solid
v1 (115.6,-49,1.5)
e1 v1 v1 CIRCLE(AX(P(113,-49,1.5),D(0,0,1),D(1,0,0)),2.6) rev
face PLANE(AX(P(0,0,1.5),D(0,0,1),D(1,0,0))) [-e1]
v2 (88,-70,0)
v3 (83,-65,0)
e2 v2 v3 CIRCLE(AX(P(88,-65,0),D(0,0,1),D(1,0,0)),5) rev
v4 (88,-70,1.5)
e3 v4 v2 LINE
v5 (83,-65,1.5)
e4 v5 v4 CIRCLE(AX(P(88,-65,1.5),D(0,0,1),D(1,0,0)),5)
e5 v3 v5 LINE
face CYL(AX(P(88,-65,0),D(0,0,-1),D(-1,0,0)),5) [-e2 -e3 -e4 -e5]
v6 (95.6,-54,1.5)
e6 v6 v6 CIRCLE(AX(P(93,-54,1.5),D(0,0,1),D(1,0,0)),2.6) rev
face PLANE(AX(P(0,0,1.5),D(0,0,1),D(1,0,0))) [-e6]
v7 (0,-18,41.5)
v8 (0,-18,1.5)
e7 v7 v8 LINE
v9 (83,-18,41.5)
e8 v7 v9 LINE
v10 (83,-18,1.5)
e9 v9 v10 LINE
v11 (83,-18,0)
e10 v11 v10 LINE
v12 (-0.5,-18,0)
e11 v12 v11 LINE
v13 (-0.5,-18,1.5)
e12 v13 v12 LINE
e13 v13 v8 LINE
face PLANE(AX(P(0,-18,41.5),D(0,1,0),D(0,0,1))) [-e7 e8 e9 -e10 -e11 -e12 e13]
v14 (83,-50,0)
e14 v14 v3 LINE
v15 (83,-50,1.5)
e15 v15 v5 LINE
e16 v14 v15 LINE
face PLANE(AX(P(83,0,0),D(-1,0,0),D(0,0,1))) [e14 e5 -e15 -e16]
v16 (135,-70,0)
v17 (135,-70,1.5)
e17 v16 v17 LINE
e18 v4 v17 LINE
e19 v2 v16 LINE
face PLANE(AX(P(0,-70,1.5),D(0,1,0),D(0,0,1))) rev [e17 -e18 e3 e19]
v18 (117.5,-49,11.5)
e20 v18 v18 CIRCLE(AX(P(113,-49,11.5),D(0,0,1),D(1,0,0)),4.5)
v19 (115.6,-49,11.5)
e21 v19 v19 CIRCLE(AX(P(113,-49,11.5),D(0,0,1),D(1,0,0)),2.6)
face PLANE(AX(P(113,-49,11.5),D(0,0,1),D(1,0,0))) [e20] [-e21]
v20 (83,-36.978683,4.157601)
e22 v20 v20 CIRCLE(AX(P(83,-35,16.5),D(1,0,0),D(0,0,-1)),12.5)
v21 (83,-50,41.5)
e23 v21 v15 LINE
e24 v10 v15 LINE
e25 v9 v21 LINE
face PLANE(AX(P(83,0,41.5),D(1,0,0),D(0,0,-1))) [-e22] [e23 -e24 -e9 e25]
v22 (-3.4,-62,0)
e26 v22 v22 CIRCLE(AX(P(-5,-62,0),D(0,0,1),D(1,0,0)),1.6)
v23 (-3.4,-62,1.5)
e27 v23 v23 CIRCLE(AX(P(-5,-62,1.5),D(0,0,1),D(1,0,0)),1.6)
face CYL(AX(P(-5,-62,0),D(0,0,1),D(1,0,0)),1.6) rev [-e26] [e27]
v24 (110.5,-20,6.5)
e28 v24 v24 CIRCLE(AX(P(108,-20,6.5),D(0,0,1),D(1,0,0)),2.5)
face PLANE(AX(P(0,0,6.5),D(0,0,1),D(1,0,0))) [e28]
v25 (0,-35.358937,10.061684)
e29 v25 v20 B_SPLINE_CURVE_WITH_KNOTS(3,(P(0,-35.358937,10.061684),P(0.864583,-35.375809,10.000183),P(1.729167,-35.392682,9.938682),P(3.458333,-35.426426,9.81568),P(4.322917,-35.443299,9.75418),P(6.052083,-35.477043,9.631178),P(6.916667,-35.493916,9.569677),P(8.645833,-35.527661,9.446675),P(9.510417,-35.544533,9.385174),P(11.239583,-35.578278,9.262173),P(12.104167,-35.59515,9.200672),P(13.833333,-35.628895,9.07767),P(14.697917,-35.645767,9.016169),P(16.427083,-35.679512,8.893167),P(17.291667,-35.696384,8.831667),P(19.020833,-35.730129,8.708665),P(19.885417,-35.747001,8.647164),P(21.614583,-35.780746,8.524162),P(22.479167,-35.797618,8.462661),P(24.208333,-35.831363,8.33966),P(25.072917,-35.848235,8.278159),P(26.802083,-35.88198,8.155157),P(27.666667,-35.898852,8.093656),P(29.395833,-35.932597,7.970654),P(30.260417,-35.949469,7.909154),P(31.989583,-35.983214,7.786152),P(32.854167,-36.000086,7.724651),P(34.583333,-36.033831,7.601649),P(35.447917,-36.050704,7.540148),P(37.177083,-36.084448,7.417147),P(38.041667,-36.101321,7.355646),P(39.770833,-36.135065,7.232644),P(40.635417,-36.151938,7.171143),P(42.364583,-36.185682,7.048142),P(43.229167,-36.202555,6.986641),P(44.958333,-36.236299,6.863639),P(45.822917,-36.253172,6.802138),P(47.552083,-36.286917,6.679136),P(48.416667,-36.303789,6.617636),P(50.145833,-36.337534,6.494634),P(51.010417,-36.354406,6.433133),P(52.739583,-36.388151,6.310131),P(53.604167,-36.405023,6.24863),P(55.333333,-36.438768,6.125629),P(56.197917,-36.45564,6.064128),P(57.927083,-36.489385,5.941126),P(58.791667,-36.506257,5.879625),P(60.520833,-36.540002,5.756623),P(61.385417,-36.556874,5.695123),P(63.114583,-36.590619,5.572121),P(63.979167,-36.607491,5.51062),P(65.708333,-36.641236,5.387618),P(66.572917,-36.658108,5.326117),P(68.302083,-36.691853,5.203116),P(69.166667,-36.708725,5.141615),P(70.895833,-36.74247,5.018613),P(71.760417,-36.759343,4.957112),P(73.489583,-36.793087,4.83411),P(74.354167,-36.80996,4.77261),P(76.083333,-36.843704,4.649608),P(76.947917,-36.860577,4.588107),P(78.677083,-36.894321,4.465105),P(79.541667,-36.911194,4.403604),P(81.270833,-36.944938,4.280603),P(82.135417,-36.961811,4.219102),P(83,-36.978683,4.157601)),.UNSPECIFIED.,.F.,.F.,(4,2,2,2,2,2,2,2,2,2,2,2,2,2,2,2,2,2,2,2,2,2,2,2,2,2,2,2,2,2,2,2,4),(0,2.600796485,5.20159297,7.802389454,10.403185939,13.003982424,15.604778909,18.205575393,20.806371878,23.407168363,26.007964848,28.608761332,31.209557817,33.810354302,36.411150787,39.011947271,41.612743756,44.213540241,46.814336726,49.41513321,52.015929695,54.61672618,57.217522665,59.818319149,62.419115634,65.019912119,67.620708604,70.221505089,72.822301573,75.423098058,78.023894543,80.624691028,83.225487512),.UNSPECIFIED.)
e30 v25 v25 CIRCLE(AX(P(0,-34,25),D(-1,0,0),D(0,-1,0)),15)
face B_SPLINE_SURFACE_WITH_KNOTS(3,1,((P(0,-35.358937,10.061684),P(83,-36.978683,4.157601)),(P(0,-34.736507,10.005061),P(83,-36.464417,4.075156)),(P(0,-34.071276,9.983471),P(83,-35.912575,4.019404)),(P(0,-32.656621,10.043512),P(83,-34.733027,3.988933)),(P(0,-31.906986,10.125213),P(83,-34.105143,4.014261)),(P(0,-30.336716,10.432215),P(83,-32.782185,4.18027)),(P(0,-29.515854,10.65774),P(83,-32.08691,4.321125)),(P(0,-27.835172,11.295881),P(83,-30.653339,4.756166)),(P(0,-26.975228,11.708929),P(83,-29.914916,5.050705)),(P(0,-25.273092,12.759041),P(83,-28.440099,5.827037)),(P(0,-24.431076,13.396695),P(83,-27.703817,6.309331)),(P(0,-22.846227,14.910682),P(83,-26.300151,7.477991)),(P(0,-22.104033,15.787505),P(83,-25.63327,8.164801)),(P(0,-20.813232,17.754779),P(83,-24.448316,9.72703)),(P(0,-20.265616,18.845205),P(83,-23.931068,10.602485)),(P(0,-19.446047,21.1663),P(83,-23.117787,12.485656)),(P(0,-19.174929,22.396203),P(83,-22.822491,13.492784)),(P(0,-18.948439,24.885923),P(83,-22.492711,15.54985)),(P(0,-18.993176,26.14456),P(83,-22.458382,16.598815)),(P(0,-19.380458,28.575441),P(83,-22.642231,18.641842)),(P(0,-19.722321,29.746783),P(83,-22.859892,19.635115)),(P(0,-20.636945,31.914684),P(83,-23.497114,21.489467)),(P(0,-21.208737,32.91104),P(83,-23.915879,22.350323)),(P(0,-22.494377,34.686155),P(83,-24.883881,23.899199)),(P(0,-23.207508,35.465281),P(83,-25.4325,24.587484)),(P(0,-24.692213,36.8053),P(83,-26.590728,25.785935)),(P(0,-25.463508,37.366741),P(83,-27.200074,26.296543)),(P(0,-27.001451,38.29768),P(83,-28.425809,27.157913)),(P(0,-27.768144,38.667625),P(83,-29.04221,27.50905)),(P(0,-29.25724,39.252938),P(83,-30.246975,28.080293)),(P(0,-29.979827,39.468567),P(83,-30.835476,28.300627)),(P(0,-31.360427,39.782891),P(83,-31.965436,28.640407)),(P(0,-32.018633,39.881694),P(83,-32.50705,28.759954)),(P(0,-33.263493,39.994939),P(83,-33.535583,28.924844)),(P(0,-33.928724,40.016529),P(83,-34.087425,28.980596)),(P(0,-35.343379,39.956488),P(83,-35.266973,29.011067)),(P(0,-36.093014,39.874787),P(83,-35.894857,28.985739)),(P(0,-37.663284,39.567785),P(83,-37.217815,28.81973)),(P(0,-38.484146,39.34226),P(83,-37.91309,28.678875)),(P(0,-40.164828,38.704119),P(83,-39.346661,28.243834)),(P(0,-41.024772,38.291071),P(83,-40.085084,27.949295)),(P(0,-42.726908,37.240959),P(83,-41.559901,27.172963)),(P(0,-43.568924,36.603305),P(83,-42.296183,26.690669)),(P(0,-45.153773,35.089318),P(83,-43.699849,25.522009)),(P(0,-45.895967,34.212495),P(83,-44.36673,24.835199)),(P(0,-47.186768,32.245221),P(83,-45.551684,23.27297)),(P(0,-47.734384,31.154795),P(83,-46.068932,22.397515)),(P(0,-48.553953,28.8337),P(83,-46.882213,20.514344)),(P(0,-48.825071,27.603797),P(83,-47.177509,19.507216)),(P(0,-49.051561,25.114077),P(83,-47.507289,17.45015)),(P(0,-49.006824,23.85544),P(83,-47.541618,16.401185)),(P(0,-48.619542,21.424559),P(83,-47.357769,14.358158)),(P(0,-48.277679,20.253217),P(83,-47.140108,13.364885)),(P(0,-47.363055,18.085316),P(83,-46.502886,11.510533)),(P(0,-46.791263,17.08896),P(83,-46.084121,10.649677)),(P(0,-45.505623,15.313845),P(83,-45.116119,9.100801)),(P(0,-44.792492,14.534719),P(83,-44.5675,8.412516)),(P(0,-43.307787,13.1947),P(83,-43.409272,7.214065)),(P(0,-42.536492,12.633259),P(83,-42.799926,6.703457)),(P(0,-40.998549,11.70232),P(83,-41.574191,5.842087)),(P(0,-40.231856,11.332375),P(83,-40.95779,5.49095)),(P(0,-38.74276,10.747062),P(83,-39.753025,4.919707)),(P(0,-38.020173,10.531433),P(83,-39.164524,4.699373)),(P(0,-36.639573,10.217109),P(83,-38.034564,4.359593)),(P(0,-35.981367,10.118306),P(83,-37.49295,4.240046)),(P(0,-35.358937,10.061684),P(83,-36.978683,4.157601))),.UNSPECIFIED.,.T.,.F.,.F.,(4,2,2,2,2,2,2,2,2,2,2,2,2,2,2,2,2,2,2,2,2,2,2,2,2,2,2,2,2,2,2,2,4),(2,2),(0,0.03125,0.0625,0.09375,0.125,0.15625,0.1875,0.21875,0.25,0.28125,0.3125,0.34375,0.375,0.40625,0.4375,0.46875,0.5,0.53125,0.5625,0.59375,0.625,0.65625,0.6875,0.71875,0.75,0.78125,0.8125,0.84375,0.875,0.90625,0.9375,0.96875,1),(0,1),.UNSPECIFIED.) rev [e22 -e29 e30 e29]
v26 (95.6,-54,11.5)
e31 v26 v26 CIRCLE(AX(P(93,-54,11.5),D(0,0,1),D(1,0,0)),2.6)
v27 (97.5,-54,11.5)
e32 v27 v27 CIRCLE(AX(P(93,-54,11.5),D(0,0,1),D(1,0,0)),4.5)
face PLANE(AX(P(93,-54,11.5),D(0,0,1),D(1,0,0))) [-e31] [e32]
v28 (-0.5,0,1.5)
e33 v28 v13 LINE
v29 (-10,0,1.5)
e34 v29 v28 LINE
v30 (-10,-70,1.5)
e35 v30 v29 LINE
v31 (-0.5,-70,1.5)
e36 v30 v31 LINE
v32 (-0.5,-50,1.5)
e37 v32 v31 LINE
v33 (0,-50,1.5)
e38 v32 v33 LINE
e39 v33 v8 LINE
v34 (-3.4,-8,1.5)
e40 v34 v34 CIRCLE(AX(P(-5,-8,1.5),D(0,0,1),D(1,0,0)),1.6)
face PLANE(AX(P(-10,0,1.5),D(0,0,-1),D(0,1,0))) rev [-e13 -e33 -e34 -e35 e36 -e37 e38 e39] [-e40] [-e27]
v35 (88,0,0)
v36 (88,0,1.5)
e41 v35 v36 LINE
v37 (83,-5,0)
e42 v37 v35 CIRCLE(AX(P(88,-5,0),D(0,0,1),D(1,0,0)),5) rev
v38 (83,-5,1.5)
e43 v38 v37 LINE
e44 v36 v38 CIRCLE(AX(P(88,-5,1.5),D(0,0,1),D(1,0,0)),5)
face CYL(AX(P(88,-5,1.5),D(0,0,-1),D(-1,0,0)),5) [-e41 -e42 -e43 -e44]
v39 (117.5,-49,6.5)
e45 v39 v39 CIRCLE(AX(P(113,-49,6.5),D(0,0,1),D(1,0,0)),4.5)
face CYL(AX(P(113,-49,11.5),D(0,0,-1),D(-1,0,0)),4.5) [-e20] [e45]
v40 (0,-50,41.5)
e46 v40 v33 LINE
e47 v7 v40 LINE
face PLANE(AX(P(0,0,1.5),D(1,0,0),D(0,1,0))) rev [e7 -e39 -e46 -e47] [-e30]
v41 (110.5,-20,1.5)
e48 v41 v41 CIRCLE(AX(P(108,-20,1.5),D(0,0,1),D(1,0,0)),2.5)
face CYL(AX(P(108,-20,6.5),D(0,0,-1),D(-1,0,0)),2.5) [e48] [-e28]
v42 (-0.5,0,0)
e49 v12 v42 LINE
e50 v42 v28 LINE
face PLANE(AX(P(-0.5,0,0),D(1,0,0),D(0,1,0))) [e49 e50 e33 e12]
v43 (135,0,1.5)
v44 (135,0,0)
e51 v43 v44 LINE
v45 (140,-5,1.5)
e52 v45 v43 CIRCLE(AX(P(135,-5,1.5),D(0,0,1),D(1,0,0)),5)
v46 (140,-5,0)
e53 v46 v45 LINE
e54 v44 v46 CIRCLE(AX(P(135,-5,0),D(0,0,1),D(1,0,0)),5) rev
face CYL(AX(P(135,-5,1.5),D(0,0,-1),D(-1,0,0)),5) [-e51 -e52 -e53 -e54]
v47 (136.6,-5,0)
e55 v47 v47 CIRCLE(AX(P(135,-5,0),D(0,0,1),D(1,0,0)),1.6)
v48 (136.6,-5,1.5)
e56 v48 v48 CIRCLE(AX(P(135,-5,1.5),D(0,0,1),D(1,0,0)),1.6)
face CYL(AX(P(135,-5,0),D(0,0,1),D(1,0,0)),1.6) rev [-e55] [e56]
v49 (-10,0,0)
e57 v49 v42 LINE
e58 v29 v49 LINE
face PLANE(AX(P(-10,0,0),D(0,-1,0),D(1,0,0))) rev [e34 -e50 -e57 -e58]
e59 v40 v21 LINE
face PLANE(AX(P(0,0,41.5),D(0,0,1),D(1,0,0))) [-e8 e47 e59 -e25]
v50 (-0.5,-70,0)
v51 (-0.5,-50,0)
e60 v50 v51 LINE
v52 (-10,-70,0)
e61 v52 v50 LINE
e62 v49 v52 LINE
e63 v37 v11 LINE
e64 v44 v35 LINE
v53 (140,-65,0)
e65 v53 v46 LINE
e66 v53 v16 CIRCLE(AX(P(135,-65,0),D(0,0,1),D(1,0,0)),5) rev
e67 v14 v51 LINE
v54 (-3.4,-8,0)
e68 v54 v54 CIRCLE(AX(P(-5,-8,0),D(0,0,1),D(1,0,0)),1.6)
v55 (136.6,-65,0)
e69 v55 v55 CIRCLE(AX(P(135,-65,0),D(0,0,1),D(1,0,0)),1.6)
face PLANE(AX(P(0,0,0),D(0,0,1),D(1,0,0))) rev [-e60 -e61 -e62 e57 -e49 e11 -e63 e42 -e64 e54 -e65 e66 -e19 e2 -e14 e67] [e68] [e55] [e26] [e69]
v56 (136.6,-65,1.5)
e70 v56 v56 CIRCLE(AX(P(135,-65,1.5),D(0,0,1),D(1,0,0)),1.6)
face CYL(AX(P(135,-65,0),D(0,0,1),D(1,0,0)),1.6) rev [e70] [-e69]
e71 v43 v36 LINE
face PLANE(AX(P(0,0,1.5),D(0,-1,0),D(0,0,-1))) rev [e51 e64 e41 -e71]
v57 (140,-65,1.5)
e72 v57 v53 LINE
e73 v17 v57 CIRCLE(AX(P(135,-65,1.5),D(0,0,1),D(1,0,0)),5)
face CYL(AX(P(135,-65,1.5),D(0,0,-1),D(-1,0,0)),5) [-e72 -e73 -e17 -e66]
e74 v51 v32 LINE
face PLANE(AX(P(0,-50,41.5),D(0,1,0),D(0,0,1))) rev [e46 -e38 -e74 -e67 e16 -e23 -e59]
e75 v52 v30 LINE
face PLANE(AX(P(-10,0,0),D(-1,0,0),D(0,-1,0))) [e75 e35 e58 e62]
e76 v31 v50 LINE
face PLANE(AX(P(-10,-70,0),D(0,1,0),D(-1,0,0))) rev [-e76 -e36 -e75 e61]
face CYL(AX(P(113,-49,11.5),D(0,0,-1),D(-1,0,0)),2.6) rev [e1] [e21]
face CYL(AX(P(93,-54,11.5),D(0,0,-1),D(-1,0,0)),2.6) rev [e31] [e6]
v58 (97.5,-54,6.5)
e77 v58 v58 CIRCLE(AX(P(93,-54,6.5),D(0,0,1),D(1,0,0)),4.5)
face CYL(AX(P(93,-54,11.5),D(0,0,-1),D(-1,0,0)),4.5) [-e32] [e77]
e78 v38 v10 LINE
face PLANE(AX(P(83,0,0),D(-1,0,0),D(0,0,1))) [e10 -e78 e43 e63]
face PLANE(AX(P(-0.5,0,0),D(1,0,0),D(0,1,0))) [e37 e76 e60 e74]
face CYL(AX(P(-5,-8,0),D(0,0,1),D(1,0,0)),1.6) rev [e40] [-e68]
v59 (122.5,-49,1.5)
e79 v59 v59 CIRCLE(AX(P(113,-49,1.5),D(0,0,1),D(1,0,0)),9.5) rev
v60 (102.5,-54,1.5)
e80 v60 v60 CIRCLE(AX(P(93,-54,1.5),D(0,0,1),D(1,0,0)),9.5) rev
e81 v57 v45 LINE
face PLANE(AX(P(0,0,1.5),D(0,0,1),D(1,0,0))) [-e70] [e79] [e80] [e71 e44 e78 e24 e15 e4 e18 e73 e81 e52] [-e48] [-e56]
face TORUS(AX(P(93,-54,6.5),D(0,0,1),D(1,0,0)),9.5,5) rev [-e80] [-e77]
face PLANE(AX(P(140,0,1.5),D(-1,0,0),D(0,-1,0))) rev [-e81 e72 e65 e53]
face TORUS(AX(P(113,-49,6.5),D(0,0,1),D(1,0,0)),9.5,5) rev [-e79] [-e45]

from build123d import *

# Parameters (mm, degrees)
ESQUISSE1_W             = 140
ESQUISSE1_H             = 70
BOSS_EXTRU_1_DEPTH      = 1.5
ESQUISSE2_R             = 1.6
ENL_V_MAT_EXTRU_2_DEPTH = 1.5
ESQUISSE2_4_R           = 2.5
BOSS_EXTRU_2_DEPTH      = 5
BOSS_EXTRU_3_DEPTH      = 40
ESQUISSE11_R            = 4.5
ESQUISSE11_R_2          = 2.6
BOSS_EXTRU_4_DEPTH      = 10
CONG_1_R                = 5
ESQUISSE14_W            = 83
ESQUISSE14_H            = 18
ESQUISSE14_H_2          = 20
ENL_V_MAT_EXTRU_3_DEPTH = 162.554944214
CONG_3_R                = 5
ESQUISSE17_W            = 1.5
ESQUISSE17_H            = 70
BOSS_EXTRU_5_DEPTH      = 10
ESQUISSE18_R            = 1.6
ENL_V_MAT_EXTRU_4_DEPTH = 162.554944239
ESQUISSE22_W            = 1.5
ESQUISSE22_H            = 18
ESQUISSE22_H_2          = 20
ENL_V_MAT_EXTRU_5_DEPTH = 0.5


with BuildPart() as part:
    # Esquisse1 → Boss.-Extru.1 (new body)
    with BuildSketch(Plane.XY):
        with Locations((70, -35)):
            Rectangle(ESQUISSE1_W, ESQUISSE1_H)
    extrude(amount=BOSS_EXTRU_1_DEPTH)

    # Esquisse2 → Enlèv. mat.-Extru.2 (cut)
    with BuildSketch(Plane.XY.offset(1.5)):
        with Locations((135, -5)):
            Circle(ESQUISSE2_R)
        with Locations((135, -65)):
            Circle(ESQUISSE2_R)
    extrude(amount=-ENL_V_MAT_EXTRU_2_DEPTH, mode=Mode.SUBTRACT)

    # Esquisse2<4> → Boss.-Extru.2 (add)
    with BuildSketch(Plane.XY.offset(1.5)):
        with Locations((108, -20)):
            Circle(ESQUISSE2_4_R)
    extrude(amount=BOSS_EXTRU_2_DEPTH)

    # Esquisse2<5> → Boss.-Extru.3 (add)
    with BuildSketch(Plane.XY.offset(1.5)):
        Polygon((83, -18), (0, -18), (0, -50), (7.5, -50), (75, -50), (76.464784117, -50), (83, -50), (83, -45), align=None)
    extrude(amount=BOSS_EXTRU_3_DEPTH)

    # Esquisse11 → Boss.-Extru.4 (add)
    # profile 1 of 2: a face of its own
    with BuildSketch(Plane.XY.offset(1.5)):
        with Locations((113, -49)):
            Circle(ESQUISSE11_R)
        with Locations((113, -49)):
            Circle(ESQUISSE11_R_2, mode=Mode.SUBTRACT)
    # profile 2 of 2: a face of its own
    with BuildSketch(Plane.XY.offset(1.5)):
        with Locations((93, -54)):
            Circle(ESQUISSE11_R)
        with Locations((93, -54)):
            Circle(ESQUISSE11_R_2, mode=Mode.SUBTRACT)
    extrude(amount=BOSS_EXTRU_4_DEPTH)

    # Congé1
    cong_1_edges = [part.edges().sort_by_distance(p)[0] for p in [
        (108.5, -49, 1.5),
        (88.5, -54, 1.5),
    ]]
    fillet(cong_1_edges, radius=CONG_1_R)

    # Esquisse14 → Enlèv. mat.-Extru.3 (cut, through all)
    with BuildSketch(Plane.XY.offset(1.5)):
        with Locations((41.5, -9)):
            Rectangle(ESQUISSE14_W, ESQUISSE14_H)
        with Locations((41.5, -60)):
            Rectangle(ESQUISSE14_W, ESQUISSE14_H_2)
    extrude(amount=-ENL_V_MAT_EXTRU_3_DEPTH, mode=Mode.SUBTRACT)

    # Congé3
    cong_3_edges = [part.edges().sort_by_distance(p)[0] for p in [
        (83, 0, 0.75),
        (140, 0, 0.75),
        (140, -70, 0.75),
        (83, -70, 0.75),
    ]]
    fillet(cong_3_edges, radius=CONG_3_R)

    # Enlèvement de matière-Lissage1: read off the stored shape, not the designer's step
    # Enlèvement de matière-Lissage1: loft between two sections, ruled curve by curve
    enl_vement_de_mati_re_lissage1_from = [
        Edge.make_bspline([(0, -35.358936945, 10.061683817), (0, -34.736507104, 10.005061444), (0, -34.071276467, 9.983471322), (0, -32.656620792, 10.043511569), (0, -31.906986183, 10.125212836), (0, -30.336715689, 10.432215403), (0, -29.515853558, 10.657740433), (0, -27.835171711, 11.295881241), (0, -26.97522752, 11.708928876), (0, -25.273092172, 12.759040897), (0, -24.43107638, 13.396695447), (0, -22.846227272, 14.910682395), (0, -22.104033135, 15.787505474), (0, -20.813231902, 17.754778804), (0, -20.26561628, 18.845205387), (0, -19.446047462, 21.166299645), (0, -19.174928563, 22.396203373), (0, -18.948439072, 24.885922737), (0, -18.993175694, 26.144559807), (0, -19.380457825, 28.575441159), (0, -19.722320583, 29.746783491), (0, -20.636945499, 31.91468419), (0, -21.20873673, 32.91104037), (0, -22.494376602, 34.686155378), (0, -23.207508016, 35.465281495), (0, -24.692213453, 36.805300064), (0, -25.463508496, 37.366741349), (0, -27.001451353, 38.297680084), (0, -27.768143671, 38.667624764), (0, -29.257240332, 39.252937618), (0, -29.979826835, 39.468566674), (0, -31.360426607, 39.782890995), (0, -32.018633214, 39.88169381), (0, -33.263492896, 39.994938556), (0, -33.928723533, 40.016528678), (0, -35.343379208, 39.956488431), (0, -36.093013817, 39.874787164), (0, -37.663284311, 39.567784597), (0, -38.484146442, 39.342259567), (0, -40.164828289, 38.704118759), (0, -41.02477248, 38.291071124), (0, -42.726907828, 37.240959103), (0, -43.56892362, 36.603304553), (0, -45.153772728, 35.089317605), (0, -45.895966865, 34.212494526), (0, -47.186768098, 32.245221196), (0, -47.73438372, 31.154794613), (0, -48.553952538, 28.833700355), (0, -48.825071437, 27.603796627), (0, -49.051560928, 25.114077263), (0, -49.006824306, 23.855440193), (0, -48.619542175, 21.424558841), (0, -48.277679417, 20.253216509), (0, -47.363054501, 18.08531581), (0, -46.79126327, 17.08895963), (0, -45.505623398, 15.313844622), (0, -44.792491984, 14.534718505), (0, -43.307786547, 13.194699936), (0, -42.536491504, 12.633258651), (0, -40.998548647, 11.702319916), (0, -40.231856329, 11.332375236), (0, -38.742759668, 10.747062382), (0, -38.020173165, 10.531433326), (0, -36.639573393, 10.217109005), (0, -35.981366786, 10.11830619), (0, -35.358936945, 10.061683817)], [0, 0, 0, 0, 0.03125, 0.03125, 0.0625, 0.0625, 0.09375, 0.09375, 0.125, 0.125, 0.15625, 0.15625, 0.1875, 0.1875, 0.21875, 0.21875, 0.25, 0.25, 0.28125, 0.28125, 0.3125, 0.3125, 0.34375, 0.34375, 0.375, 0.375, 0.40625, 0.40625, 0.4375, 0.4375, 0.46875, 0.46875, 0.5, 0.5, 0.53125, 0.53125, 0.5625, 0.5625, 0.59375, 0.59375, 0.625, 0.625, 0.65625, 0.65625, 0.6875, 0.6875, 0.71875, 0.71875, 0.75, 0.75, 0.78125, 0.78125, 0.8125, 0.8125, 0.84375, 0.84375, 0.875, 0.875, 0.90625, 0.90625, 0.9375, 0.9375, 0.96875, 0.96875, 1, 1, 1, 1], 3),
    ]
    enl_vement_de_mati_re_lissage1_to = [
        Edge.make_bspline([(83, -36.978683165, 4.157601006), (83, -36.46441654, 4.075155874), (83, -35.912574895, 4.019404171), (83, -34.733027399, 3.988933266), (83, -34.105143284, 4.014261099), (83, -32.782184956, 4.18027026), (83, -32.086909931, 4.321124739), (83, -30.653339337, 4.756165981), (83, -29.914915742, 5.050704715), (83, -28.440098529, 5.827037097), (83, -27.703817174, 6.30933137), (83, -26.300151244, 7.477991211), (83, -25.633270194, 8.16480105), (83, -24.448315736, 9.727029605), (83, -23.931067977, 10.602484983), (83, -23.117787224, 12.485655838), (83, -22.82249127, 13.492783585), (83, -22.492710742, 15.549850084), (83, -22.458382278, 16.598815077), (83, -22.642231037, 18.641841677), (83, -22.85989188, 19.635114611), (83, -23.497113975, 21.489467093), (83, -23.915879492, 22.35032337), (83, -24.883881149, 23.899199305), (83, -25.432500118, 24.587483568), (83, -26.590728024, 25.785935025), (83, -27.200073831, 26.296542663), (83, -28.425809001, 27.15791298), (83, -29.04220995, 27.509050012), (83, -30.246974936, 28.080293485), (83, -30.835475596, 28.300627173), (83, -31.965435919, 28.640407161), (83, -32.50705021, 28.759953862), (83, -33.53558346, 28.924844126), (83, -34.087425105, 28.980595829), (83, -35.266972601, 29.011066734), (83, -35.894856716, 28.985738901), (83, -37.217815044, 28.81972974), (83, -37.913090069, 28.678875261), (83, -39.346660663, 28.243834019), (83, -40.085084258, 27.949295285), (83, -41.559901471, 27.172962903), (83, -42.296182826, 26.69066863), (83, -43.699848756, 25.522008789), (83, -44.366729806, 24.83519895), (83, -45.551684264, 23.272970395), (83, -46.068932023, 22.397515017), (83, -46.882212776, 20.514344162), (83, -47.17750873, 19.507216415), (83, -47.507289258, 17.450149916), (83, -47.541617722, 16.401184923), (83, -47.357768963, 14.358158323), (83, -47.14010812, 13.364885389), (83, -46.502886025, 11.510532907), (83, -46.084120508, 10.64967663), (83, -45.116118851, 9.100800695), (83, -44.567499882, 8.412516432), (83, -43.409271976, 7.214064975), (83, -42.799926169, 6.703457337), (83, -41.574190999, 5.84208702), (83, -40.95779005, 5.490949988), (83, -39.753025064, 4.919706515), (83, -39.164524404, 4.699372827), (83, -38.034564081, 4.359592839), (83, -37.49294979, 4.240046138), (83, -36.978683165, 4.157601006)], [0, 0, 0, 0, 0.03125, 0.03125, 0.0625, 0.0625, 0.09375, 0.09375, 0.125, 0.125, 0.15625, 0.15625, 0.1875, 0.1875, 0.21875, 0.21875, 0.25, 0.25, 0.28125, 0.28125, 0.3125, 0.3125, 0.34375, 0.34375, 0.375, 0.375, 0.40625, 0.40625, 0.4375, 0.4375, 0.46875, 0.46875, 0.5, 0.5, 0.53125, 0.53125, 0.5625, 0.5625, 0.59375, 0.59375, 0.625, 0.625, 0.65625, 0.65625, 0.6875, 0.6875, 0.71875, 0.71875, 0.75, 0.75, 0.78125, 0.78125, 0.8125, 0.8125, 0.84375, 0.84375, 0.875, 0.875, 0.90625, 0.90625, 0.9375, 0.9375, 0.96875, 0.96875, 1, 1, 1, 1], 3),
    ]
    enl_vement_de_mati_re_lissage1 = Solid(Shell([*[Face.make_surface_from_curves(enl_vement_de_mati_re_lissage1_from[k], enl_vement_de_mati_re_lissage1_to[k]) for k in range(1)], Face(Wire(enl_vement_de_mati_re_lissage1_from)), Face(Wire(enl_vement_de_mati_re_lissage1_to))]))
    add(enl_vement_de_mati_re_lissage1, mode=Mode.SUBTRACT)

    # Esquisse17 → Boss.-Extru.5 (add)
    with BuildSketch(Plane.ZY):
        with Locations((0.75, -35)):
            Rectangle(ESQUISSE17_W, ESQUISSE17_H)
    extrude(amount=BOSS_EXTRU_5_DEPTH)

    # Esquisse18 → Enlèv. mat.-Extru.4 (cut, through all)
    with BuildSketch(Plane.XY.offset(1.5)):
        with Locations((-5, -8)):
            Circle(ESQUISSE18_R)
        with Locations((-5, -62)):
            Circle(ESQUISSE18_R)
    extrude(amount=-ENL_V_MAT_EXTRU_4_DEPTH, mode=Mode.SUBTRACT)

    # Esquisse22 → Enlèv. mat.-Extru.5 (cut)
    with BuildSketch(Plane(origin=(0, 0, 0), x_dir=(0, 0, -1), z_dir=(1, 0, 0))):
        with Locations((-0.75, -9)):
            Rectangle(ESQUISSE22_W, ESQUISSE22_H)
        with Locations((-0.75, -60)):
            Rectangle(ESQUISSE22_W, ESQUISSE22_H_2)
    extrude(amount=-ENL_V_MAT_EXTRU_5_DEPTH, mode=Mode.SUBTRACT)


solid = part.part
